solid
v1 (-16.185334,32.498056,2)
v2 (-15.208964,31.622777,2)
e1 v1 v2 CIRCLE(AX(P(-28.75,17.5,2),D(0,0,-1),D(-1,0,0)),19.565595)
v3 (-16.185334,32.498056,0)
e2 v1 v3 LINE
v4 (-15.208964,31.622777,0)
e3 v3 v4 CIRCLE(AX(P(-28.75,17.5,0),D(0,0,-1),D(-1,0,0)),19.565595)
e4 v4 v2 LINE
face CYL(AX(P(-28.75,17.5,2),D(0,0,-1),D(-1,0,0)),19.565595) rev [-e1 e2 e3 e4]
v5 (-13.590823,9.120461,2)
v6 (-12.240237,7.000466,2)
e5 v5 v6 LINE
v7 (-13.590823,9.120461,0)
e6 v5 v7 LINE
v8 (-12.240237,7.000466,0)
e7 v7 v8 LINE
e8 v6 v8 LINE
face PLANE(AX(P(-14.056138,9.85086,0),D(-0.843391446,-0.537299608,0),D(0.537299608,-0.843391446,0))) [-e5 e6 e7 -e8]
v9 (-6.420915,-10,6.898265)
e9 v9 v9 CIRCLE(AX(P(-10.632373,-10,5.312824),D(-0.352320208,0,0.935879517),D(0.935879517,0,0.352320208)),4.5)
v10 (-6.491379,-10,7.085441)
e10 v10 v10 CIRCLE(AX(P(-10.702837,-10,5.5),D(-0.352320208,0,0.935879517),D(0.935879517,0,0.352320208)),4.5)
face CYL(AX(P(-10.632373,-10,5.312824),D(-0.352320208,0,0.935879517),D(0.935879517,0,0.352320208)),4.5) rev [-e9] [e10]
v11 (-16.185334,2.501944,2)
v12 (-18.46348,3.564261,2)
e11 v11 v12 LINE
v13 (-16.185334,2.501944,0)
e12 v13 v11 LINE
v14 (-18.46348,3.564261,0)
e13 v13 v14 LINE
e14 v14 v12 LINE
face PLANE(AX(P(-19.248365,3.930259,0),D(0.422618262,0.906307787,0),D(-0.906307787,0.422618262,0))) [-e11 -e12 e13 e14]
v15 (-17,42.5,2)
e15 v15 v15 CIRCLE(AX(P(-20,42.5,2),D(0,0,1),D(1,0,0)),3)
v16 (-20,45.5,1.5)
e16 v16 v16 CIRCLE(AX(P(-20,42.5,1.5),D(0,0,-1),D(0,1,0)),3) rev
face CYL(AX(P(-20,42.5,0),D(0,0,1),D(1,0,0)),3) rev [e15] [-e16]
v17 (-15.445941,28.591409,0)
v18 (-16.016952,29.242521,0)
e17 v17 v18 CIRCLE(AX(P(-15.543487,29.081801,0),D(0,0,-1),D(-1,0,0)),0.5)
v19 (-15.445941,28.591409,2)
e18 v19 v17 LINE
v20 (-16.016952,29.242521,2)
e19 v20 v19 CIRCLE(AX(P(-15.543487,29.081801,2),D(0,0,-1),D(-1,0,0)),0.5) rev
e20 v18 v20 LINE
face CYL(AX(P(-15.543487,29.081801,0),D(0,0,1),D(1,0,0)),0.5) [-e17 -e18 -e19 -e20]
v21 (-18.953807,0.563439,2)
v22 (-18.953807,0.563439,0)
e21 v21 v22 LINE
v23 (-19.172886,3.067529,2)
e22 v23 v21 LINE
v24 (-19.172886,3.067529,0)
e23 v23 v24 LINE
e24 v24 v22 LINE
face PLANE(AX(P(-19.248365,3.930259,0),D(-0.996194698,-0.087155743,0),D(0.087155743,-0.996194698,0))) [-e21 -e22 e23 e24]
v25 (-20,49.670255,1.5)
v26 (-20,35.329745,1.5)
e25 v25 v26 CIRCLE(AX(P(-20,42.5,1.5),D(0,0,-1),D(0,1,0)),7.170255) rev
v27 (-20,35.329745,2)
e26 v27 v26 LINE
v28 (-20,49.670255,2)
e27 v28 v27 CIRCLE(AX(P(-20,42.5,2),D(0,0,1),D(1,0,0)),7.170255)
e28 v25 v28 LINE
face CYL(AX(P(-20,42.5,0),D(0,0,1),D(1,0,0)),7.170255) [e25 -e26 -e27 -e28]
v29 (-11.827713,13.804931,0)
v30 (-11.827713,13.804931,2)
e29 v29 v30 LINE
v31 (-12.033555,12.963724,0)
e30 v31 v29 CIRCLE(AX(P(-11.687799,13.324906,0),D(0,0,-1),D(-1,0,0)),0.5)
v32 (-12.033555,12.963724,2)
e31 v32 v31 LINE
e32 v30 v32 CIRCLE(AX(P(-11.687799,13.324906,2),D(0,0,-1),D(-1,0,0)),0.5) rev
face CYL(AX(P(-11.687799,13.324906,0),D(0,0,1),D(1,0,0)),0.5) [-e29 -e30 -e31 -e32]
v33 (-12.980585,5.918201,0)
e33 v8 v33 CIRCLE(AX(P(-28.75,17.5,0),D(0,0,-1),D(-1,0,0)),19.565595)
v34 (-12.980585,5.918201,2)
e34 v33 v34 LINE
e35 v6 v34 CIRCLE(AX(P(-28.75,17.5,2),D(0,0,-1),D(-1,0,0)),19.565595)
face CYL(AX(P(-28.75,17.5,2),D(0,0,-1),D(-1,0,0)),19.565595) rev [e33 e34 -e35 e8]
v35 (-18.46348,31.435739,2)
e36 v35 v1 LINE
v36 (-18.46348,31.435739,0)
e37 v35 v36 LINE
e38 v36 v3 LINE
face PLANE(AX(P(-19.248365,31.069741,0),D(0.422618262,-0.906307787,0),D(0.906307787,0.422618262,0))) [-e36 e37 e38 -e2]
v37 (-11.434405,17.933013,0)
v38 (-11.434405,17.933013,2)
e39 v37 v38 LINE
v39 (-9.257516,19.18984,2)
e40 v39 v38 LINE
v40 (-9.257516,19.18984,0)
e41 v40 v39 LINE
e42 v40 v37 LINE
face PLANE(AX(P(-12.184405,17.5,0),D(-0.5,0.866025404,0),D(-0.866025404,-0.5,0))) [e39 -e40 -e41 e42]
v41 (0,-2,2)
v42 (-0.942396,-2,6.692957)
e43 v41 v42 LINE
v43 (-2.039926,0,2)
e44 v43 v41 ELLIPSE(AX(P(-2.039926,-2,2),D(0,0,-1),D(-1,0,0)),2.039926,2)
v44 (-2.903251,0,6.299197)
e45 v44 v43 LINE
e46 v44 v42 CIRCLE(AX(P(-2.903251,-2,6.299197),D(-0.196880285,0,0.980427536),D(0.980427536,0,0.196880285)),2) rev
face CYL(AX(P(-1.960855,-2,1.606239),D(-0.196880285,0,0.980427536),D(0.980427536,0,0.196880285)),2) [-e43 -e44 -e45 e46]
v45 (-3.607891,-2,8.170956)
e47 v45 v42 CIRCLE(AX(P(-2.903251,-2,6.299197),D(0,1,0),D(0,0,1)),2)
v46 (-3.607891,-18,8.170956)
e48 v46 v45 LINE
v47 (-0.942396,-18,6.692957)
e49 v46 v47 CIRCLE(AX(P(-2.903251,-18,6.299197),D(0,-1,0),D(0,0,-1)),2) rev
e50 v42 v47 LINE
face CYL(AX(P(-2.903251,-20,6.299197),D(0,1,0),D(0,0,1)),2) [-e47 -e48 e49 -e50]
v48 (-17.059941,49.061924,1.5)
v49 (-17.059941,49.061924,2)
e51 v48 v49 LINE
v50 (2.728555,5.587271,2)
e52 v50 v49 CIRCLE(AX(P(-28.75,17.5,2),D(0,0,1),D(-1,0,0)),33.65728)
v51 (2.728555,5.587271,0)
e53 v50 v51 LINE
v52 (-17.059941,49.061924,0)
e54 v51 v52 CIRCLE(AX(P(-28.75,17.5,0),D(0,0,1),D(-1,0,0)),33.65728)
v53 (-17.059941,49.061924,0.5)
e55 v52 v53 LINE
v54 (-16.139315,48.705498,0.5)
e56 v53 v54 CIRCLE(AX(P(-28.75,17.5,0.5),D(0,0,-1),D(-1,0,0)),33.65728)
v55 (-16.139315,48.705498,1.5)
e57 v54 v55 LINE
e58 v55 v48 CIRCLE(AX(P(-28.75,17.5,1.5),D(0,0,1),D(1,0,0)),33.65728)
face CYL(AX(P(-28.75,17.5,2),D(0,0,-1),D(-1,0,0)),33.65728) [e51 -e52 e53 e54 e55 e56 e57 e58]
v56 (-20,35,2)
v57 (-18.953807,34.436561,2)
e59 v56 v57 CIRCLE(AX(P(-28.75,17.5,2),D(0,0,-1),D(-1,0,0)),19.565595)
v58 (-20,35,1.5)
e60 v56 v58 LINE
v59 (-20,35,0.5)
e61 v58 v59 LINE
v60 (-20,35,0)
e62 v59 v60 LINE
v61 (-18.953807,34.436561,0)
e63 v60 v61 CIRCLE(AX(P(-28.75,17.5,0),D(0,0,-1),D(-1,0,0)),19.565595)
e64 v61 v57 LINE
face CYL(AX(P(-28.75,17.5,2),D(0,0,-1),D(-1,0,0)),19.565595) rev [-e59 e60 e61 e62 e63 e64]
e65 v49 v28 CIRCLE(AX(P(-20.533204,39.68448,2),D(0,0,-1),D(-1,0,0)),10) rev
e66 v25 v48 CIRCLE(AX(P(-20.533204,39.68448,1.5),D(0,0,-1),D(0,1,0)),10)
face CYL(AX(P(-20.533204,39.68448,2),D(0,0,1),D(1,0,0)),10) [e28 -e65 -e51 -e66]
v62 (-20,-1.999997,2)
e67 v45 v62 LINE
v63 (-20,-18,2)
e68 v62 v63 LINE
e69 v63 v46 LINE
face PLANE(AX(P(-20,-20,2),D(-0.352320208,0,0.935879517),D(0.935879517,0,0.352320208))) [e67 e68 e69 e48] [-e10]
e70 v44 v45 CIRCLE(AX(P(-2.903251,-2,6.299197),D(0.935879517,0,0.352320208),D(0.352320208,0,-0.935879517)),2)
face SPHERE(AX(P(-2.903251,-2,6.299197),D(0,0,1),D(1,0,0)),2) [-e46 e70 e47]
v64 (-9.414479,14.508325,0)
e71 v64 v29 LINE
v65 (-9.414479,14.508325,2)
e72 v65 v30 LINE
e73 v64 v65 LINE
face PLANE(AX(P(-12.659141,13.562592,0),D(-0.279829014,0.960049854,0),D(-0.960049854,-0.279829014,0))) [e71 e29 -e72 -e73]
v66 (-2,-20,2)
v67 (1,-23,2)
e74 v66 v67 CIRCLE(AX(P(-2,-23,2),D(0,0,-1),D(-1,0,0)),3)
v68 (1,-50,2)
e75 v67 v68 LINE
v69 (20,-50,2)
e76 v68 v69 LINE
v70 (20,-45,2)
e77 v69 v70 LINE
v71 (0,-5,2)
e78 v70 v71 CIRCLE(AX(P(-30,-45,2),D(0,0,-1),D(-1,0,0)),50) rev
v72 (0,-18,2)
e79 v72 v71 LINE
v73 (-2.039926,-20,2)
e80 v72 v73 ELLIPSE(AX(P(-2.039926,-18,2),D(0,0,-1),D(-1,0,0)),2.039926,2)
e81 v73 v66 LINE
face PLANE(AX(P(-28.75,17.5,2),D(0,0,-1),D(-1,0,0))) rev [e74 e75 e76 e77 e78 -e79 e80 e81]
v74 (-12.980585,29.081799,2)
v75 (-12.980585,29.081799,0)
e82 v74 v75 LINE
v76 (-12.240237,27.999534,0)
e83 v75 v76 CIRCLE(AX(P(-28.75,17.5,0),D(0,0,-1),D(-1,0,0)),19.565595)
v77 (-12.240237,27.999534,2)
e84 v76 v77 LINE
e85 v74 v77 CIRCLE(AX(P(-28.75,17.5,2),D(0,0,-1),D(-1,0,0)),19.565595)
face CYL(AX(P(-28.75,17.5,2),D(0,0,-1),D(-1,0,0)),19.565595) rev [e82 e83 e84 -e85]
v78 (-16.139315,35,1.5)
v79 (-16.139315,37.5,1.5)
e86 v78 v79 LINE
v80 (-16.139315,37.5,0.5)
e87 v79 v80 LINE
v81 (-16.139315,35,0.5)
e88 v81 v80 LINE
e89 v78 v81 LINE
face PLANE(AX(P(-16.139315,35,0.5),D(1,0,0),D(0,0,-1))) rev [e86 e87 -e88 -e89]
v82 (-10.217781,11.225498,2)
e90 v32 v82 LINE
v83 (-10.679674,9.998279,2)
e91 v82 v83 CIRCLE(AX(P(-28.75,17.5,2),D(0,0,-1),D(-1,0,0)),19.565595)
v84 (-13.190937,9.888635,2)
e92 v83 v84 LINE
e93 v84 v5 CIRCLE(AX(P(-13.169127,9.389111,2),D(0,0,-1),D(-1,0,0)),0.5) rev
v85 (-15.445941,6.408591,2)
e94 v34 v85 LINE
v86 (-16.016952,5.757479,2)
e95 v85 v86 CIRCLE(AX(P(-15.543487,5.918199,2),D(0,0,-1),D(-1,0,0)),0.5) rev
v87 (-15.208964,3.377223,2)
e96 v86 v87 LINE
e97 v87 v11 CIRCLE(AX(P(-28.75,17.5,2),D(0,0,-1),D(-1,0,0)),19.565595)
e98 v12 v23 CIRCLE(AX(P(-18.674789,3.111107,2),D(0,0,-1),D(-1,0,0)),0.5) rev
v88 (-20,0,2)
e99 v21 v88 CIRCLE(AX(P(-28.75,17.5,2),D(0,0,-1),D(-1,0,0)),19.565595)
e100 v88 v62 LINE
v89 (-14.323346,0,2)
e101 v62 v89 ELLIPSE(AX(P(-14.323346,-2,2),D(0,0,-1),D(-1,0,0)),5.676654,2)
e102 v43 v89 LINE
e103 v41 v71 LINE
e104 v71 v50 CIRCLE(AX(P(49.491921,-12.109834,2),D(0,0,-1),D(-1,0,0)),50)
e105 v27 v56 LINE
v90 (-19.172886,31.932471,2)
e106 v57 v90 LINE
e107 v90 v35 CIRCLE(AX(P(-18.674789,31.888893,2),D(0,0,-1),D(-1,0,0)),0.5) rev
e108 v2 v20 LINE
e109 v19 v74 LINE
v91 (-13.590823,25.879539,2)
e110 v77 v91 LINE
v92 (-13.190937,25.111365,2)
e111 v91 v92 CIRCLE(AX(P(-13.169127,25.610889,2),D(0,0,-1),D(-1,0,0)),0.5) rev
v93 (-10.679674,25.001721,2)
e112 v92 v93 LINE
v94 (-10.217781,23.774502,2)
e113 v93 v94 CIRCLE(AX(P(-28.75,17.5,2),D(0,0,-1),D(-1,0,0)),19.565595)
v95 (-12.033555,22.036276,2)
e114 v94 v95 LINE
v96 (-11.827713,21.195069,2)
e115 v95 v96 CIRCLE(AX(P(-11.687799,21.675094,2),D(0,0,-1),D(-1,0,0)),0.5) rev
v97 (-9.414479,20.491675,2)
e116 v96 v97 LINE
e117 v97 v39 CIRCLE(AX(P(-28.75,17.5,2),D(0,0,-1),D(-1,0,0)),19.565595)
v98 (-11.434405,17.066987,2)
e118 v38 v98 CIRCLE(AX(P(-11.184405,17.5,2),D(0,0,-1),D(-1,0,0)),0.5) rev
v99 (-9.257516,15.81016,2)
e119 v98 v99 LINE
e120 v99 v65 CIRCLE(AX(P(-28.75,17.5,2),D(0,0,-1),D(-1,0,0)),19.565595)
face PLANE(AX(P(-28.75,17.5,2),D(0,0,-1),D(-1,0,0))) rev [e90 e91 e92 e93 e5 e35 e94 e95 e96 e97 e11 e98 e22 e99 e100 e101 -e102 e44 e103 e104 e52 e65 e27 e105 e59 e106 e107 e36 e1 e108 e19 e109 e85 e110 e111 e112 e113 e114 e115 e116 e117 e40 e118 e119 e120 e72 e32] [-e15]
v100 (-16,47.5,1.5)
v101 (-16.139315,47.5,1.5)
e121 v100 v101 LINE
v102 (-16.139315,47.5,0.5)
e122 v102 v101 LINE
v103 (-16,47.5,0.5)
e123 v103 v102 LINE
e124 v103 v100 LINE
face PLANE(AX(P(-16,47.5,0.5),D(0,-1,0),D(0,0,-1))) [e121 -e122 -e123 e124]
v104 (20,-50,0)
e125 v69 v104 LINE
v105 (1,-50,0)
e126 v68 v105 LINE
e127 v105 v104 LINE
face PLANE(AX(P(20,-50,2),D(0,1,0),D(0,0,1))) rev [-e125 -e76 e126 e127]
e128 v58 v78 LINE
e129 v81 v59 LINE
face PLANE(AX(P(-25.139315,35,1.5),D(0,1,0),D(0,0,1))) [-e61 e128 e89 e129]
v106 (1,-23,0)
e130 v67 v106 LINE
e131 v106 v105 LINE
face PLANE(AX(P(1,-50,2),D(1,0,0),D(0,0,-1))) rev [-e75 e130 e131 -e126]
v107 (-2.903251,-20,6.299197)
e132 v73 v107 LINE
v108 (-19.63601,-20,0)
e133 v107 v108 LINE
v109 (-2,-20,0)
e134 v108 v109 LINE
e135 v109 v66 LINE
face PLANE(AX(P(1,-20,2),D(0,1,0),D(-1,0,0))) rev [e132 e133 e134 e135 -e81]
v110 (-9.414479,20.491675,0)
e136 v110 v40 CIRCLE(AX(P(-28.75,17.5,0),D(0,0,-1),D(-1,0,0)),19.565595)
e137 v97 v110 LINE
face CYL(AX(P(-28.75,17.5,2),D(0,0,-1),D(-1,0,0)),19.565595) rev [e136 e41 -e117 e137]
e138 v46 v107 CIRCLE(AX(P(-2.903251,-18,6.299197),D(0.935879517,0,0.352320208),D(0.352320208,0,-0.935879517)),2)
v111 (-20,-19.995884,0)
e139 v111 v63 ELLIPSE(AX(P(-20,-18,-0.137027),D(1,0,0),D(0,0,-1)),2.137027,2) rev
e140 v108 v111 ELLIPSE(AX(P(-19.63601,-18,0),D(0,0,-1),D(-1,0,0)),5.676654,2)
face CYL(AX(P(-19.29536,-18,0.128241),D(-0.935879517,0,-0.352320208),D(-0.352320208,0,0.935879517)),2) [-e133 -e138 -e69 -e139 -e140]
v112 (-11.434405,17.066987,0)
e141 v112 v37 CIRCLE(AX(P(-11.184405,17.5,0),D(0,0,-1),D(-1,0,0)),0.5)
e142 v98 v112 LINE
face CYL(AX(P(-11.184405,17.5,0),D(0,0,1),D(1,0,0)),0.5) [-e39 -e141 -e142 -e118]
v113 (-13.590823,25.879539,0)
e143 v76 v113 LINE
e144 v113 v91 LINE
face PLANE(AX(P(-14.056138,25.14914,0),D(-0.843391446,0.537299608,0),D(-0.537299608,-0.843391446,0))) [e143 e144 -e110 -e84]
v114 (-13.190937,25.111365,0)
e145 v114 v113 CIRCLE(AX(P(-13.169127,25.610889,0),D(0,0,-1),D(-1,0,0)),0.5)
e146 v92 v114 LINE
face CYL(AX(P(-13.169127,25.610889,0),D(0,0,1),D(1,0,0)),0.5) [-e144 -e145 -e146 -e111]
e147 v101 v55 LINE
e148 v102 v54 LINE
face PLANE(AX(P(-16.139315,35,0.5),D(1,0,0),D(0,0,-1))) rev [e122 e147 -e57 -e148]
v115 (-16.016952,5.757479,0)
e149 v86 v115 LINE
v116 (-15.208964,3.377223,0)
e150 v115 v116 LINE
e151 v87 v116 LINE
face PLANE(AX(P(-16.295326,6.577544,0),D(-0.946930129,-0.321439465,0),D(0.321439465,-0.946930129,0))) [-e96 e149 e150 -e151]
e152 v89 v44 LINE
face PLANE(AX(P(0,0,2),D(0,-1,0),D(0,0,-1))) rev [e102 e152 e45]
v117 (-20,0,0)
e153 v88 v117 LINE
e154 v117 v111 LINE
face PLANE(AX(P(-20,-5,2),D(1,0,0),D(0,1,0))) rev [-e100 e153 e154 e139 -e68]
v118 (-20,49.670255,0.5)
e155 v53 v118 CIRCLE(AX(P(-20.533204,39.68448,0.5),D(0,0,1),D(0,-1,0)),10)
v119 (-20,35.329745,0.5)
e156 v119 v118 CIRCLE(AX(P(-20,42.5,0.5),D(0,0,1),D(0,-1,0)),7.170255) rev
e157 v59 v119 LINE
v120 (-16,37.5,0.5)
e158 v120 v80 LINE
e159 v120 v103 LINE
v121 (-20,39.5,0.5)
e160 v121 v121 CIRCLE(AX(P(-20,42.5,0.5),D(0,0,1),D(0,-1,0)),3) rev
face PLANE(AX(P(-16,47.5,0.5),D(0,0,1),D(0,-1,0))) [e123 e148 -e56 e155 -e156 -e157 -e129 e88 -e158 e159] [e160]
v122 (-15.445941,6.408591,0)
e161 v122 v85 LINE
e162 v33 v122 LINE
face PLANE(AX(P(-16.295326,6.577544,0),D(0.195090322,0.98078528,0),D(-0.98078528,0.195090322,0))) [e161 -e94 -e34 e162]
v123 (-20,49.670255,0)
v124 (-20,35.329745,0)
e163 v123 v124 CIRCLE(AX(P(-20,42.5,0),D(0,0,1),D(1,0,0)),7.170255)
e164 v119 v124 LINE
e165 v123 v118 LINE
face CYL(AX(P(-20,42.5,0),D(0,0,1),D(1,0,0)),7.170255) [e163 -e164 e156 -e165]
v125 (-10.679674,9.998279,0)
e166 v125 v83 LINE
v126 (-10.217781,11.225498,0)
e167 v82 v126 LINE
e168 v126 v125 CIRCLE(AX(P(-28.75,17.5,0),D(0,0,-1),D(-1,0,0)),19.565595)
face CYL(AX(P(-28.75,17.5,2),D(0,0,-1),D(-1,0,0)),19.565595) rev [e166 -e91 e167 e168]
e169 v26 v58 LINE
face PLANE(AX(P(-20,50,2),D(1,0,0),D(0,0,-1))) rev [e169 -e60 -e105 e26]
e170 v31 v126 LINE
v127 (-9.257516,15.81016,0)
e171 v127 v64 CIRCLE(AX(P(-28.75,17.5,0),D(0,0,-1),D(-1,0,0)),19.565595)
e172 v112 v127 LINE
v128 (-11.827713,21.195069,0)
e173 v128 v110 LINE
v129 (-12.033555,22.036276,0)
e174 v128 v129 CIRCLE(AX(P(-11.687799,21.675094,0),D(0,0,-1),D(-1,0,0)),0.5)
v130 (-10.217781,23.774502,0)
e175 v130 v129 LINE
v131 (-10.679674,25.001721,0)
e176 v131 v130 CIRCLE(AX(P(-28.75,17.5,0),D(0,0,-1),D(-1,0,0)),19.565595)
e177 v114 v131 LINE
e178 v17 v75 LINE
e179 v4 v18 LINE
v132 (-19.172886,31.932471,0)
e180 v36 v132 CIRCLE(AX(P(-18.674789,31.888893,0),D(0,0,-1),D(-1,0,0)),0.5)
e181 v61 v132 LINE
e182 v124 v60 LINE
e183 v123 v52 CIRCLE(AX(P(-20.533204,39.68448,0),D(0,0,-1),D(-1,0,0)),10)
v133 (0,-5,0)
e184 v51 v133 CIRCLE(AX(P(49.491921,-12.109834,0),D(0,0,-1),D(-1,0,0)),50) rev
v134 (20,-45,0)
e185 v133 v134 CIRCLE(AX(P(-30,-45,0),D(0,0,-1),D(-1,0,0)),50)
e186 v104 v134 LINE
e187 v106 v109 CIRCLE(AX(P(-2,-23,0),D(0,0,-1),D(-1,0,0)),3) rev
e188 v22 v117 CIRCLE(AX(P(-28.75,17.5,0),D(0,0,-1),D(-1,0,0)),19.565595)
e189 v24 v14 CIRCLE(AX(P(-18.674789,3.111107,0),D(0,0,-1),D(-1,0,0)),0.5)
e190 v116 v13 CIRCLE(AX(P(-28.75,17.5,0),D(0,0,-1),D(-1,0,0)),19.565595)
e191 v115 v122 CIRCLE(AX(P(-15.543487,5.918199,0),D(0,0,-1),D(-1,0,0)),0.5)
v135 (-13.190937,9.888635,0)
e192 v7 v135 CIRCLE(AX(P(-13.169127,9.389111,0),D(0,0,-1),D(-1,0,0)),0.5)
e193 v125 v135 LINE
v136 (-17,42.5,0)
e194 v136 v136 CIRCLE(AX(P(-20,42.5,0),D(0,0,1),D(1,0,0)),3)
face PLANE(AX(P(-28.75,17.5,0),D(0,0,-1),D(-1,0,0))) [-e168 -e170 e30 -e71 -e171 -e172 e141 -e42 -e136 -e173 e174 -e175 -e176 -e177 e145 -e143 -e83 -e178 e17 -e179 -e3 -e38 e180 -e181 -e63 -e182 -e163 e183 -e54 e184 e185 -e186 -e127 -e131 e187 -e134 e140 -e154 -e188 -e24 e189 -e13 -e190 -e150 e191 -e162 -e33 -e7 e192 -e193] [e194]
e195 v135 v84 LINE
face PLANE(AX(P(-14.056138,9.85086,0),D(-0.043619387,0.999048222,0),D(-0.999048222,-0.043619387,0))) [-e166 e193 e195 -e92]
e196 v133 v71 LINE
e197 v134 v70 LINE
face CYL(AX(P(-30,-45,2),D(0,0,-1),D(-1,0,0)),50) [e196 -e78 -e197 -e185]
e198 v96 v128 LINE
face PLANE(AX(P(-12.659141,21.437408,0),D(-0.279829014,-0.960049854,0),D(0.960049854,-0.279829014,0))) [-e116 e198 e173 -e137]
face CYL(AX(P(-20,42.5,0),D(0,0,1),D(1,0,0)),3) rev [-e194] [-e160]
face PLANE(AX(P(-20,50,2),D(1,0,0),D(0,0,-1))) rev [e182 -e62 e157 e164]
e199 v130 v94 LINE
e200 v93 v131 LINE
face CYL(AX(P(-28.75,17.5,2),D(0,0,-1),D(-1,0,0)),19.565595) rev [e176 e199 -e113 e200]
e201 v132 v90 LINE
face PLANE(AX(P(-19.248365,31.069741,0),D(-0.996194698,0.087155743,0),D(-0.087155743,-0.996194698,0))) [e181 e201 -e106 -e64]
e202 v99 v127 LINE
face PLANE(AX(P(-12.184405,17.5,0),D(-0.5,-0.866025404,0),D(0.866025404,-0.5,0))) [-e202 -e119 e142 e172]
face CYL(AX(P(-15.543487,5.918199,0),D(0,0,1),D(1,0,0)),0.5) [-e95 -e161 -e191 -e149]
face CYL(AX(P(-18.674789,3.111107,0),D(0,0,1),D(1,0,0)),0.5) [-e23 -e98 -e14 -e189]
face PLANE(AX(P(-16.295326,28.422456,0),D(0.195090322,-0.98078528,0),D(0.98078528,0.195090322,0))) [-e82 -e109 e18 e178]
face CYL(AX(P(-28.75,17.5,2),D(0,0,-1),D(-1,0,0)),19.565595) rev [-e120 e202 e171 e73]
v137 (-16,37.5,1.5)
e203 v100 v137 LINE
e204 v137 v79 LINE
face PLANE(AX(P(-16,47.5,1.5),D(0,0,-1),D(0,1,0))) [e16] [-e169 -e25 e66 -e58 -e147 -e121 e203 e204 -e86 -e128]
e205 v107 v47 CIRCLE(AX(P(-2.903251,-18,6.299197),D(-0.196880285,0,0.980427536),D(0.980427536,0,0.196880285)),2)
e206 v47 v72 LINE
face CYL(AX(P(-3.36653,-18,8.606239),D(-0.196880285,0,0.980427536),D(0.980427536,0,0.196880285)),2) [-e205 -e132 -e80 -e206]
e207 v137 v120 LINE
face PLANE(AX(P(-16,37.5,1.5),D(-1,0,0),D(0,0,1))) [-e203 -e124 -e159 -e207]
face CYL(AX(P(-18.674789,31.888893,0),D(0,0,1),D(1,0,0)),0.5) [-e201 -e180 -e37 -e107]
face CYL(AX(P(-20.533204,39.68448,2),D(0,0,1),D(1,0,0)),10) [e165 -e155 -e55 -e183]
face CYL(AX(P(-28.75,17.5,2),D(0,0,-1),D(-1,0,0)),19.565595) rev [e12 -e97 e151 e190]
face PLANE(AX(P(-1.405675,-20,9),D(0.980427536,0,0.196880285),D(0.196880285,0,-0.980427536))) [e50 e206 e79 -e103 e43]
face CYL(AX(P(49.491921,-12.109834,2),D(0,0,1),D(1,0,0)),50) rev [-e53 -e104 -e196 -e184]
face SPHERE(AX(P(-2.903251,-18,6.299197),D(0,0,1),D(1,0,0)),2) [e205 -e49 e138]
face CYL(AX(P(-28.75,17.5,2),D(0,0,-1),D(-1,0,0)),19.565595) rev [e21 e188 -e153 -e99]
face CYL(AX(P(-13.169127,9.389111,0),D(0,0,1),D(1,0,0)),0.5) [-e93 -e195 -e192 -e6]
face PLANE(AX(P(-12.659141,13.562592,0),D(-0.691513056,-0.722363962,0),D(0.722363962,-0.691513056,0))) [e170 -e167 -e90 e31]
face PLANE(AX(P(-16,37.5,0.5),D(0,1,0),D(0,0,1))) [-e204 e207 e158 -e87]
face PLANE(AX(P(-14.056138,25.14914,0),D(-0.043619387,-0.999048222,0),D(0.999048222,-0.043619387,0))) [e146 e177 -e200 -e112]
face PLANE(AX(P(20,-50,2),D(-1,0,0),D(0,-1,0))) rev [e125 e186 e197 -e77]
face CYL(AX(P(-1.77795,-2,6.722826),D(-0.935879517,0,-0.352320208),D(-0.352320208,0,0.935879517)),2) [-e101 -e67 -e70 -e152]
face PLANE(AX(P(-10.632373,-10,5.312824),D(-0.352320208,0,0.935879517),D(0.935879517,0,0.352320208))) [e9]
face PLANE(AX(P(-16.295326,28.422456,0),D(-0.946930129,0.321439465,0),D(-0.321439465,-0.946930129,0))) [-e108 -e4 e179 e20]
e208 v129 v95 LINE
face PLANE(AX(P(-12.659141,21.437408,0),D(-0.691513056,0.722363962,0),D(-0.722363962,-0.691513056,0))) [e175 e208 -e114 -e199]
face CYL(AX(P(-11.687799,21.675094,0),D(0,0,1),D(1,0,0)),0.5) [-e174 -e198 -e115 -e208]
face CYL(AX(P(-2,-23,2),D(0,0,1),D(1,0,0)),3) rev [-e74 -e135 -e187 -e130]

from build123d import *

# Parameters (mm, degrees)
BOSS_EXTRUDE1_DEPTH       = 2
BOSS_EXTRUDE2_DEPTH       = 2
CIRPATTERN1_COUNT         = 5
CIRPATTERN1_ANGLE         = 55
CIRPATTERN2_COPY_1_DEPTH  = 2
CIRPATTERN2_COPY_2_DEPTH  = 2
CIRPATTERN2_COPY_3_DEPTH  = 2
CIRPATTERN2_COPY_4_DEPTH  = 2
CIRPATTERN2_COPY_5_DEPTH  = 2
CIRPATTERN2_COPY_6_DEPTH  = 2
CIRPATTERN2_COPY_7_DEPTH  = 2
CIRPATTERN2_COPY_8_DEPTH  = 2
CIRPATTERN2_COPY_9_DEPTH  = 2
CIRPATTERN2_COPY_10_DEPTH = 2
CIRPATTERN2_COPY_11_DEPTH = 2
CIRPATTERN2_COPY_12_DEPTH = 2
CIRPATTERN2_COPY_13_DEPTH = 2
CIRPATTERN2_COPY_14_DEPTH = 2
CIRPATTERN2_COPY_15_DEPTH = 2
CIRPATTERN2_COPY_16_DEPTH = 2
CIRPATTERN2_COPY_17_DEPTH = 2
CIRPATTERN2_COPY_18_DEPTH = 2
CIRPATTERN2_COPY_19_DEPTH = 2
CIRPATTERN2_COPY_20_DEPTH = 2
BOSS_EXTRUDE3_START       = -20
BOSS_EXTRUDE3_DEPTH       = 20
SKETCH7_R                 = 4.5
CUT_EXTRUDE1_DEPTH        = 0.2
FILLET1_R                 = 2
SKETCH15_R                = 7.170254919
BOSS_EXTRUDE6_DEPTH       = 2
SKETCH16_R                = 3
CUT_EXTRUDE2_DEPTH        = 58.252970512
SKETCH17_W                = 1
SKETCH17_H                = 10
CUT_EXTRUDE3_DEPTH        = 14
SKETCH18_W                = 9
SKETCH18_H                = 1
CUT_EXTRUDE4_DEPTH        = 20
FILLET2_R                 = 10
FILLET3_R                 = 50
FILLET5_R                 = 0.5
FILLET6_R                 = 3


with BuildPart() as part:
    # Sketch1 → Boss-Extrude1 (new body)
    with BuildSketch(Plane.XY):
        with BuildLine():
            Line((-20, -5), (-20, -20))
            Line((-20, -20), (0, -20))
            Line((0, -20), (1, -20))
            Line((1, -20), (1, -50))
            Line((1, -50), (20, -50))
            Line((20, -50), (20, -5))
            Line((20, -5), (0, -5))
            Line((0, -5), (0, 0))
            ThreePointArc((0, 0), (2.5, 30), (-20, 50))
            Line((-20, 50), (-20, 35))
            ThreePointArc((-20, 35), (-9.184405197, 17.5), (-20, 0))
            Line((-20, 0), (-20, -5))
        make_face()
    extrude(amount=BOSS_EXTRUDE1_DEPTH)

    # Sketch2 → Boss-Extrude2 (add)
    with BuildSketch(Plane.XY.offset(2)):
        Polygon((-12.184405197, 17.5), (-8.511312338, 19.620661151), (-8.511312338, 15.379338849), align=None)
    boss_extrude2 = extrude(amount=-BOSS_EXTRUDE2_DEPTH)

    # CirPattern1: Boss-Extrude2 ×5 about axis
    cirpattern1_axis = Axis((-28.75, 17.5, 0), (0, 0, -1))
    for i in range(1, CIRPATTERN1_COUNT):
        add(boss_extrude2.rotate(cirpattern1_axis, i * CIRPATTERN1_ANGLE / (CIRPATTERN1_COUNT - 1)))

    # CirPattern2 copy 1 sketch → CirPattern2 copy 1 (add)
    with BuildSketch(Plane.XY.offset(2)):
        Polygon((-12.184405197, 17.5), (-8.511312338, 19.620661151), (-8.511312338, 15.379338849), align=None)
    extrude(amount=-CIRPATTERN2_COPY_1_DEPTH)

    # CirPattern2 copy 2 sketch → CirPattern2 copy 2 (add)
    with BuildSketch(Plane(origin=(3.335587623, 7.334983183, 2), x_dir=(0.9713420698132613, 0.23768589232617357, 0), z_dir=(0, 0, 1))):
        Polygon((-12.184405197, 17.5), (-8.511312338, 19.620661151), (-8.511312338, 15.379338849), align=None)
    extrude(amount=-CIRPATTERN2_COPY_2_DEPTH)

    # CirPattern2 copy 3 sketch → CirPattern2 copy 3 (add)
    with BuildSketch(Plane(origin=(4.832162185, 15.25258305, 2), x_dir=(0.8870108331782213, 0.46174861323503485, 0), z_dir=(0, 0, 1))):
        Polygon((-12.184405197, 17.5), (-8.511312338, 19.620661151), (-8.511312338, 15.379338849), align=None)
    extrude(amount=-CIRPATTERN2_COPY_3_DEPTH)

    # CirPattern2 copy 4 sketch → CirPattern2 copy 4 (add)
    with BuildSketch(Plane(origin=(4.403946229, 23.298995553, 2), x_dir=(0.7518398074789764, 0.6593458151000701, 0), z_dir=(0, 0, 1))):
        Polygon((-12.184405197, 17.5), (-8.511312338, 19.620661151), (-8.511312338, 15.379338849), align=None)
    extrude(amount=-CIRPATTERN2_COPY_4_DEPTH)

    # CirPattern2 copy 5 sketch → CirPattern2 copy 5 (add)
    with BuildSketch(Plane(origin=(-4.983418609, -6.331955626, 2), x_dir=(0.9713420698132613, -0.23768589232617357, 0), z_dir=(0, 0, 1))):
        Polygon((-12.184405197, 17.5), (-8.511312338, 19.620661151), (-8.511312338, 15.379338849), align=None)
    extrude(amount=-CIRPATTERN2_COPY_5_DEPTH)

    # CirPattern2 copy 6 sketch → CirPattern2 copy 6 (add)
    with BuildSketch(Plane.XY.offset(2)):
        Polygon((-12.184405197, 17.5), (-8.511312338, 19.620661151), (-8.511312338, 15.379338849), align=None)
    extrude(amount=-CIRPATTERN2_COPY_6_DEPTH)

    # CirPattern2 copy 7 sketch → CirPattern2 copy 7 (add)
    with BuildSketch(Plane(origin=(3.335587623, 7.334983183, 2), x_dir=(0.9713420698132613, 0.2376858923261736, 0), z_dir=(0, 0, 1))):
        Polygon((-12.184405197, 17.5), (-8.511312338, 19.620661151), (-8.511312338, 15.379338849), align=None)
    extrude(amount=-CIRPATTERN2_COPY_7_DEPTH)

    # CirPattern2 copy 8 sketch → CirPattern2 copy 8 (add)
    with BuildSketch(Plane(origin=(4.832162185, 15.25258305, 2), x_dir=(0.8870108331782214, 0.4617486132350349, 0), z_dir=(0, 0, 1))):
        Polygon((-12.184405197, 17.5), (-8.511312338, 19.620661151), (-8.511312338, 15.379338849), align=None)
    extrude(amount=-CIRPATTERN2_COPY_8_DEPTH)

    # CirPattern2 copy 9 sketch → CirPattern2 copy 9 (add)
    with BuildSketch(Plane(origin=(-11.329039278, -11.297962211, 2), x_dir=(0.8870108331782213, -0.46174861323503485, 0), z_dir=(0, 0, 1))):
        Polygon((-12.184405197, 17.5), (-8.511312338, 19.620661151), (-8.511312338, 15.379338849), align=None)
    extrude(amount=-CIRPATTERN2_COPY_9_DEPTH)

    # CirPattern2 copy 10 sketch → CirPattern2 copy 10 (add)
    with BuildSketch(Plane(origin=(-4.983418609, -6.331955626, 2), x_dir=(0.9713420698132613, -0.2376858923261736, 0), z_dir=(0, 0, 1))):
        Polygon((-12.184405197, 17.5), (-8.511312338, 19.620661151), (-8.511312338, 15.379338849), align=None)
    extrude(amount=-CIRPATTERN2_COPY_10_DEPTH)

    # CirPattern2 copy 11 sketch → CirPattern2 copy 11 (add)
    with BuildSketch(Plane.XY.offset(2)):
        Polygon((-12.184405197, 17.5), (-8.511312338, 19.620661151), (-8.511312338, 15.379338849), align=None)
    extrude(amount=-CIRPATTERN2_COPY_11_DEPTH)

    # CirPattern2 copy 12 sketch → CirPattern2 copy 12 (add)
    with BuildSketch(Plane(origin=(3.335587623, 7.334983183, 2), x_dir=(0.9713420698132613, 0.2376858923261736, 0), z_dir=(0, 0, 1))):
        Polygon((-12.184405197, 17.5), (-8.511312338, 19.620661151), (-8.511312338, 15.379338849), align=None)
    extrude(amount=-CIRPATTERN2_COPY_12_DEPTH)

    # CirPattern2 copy 13 sketch → CirPattern2 copy 13 (add)
    with BuildSketch(Plane(origin=(-18.673157299, -14.613388815, 2), x_dir=(0.7518398074789764, -0.6593458151000701, 0), z_dir=(0, 0, 1))):
        Polygon((-12.184405197, 17.5), (-8.511312338, 19.620661151), (-8.511312338, 15.379338849), align=None)
    extrude(amount=-CIRPATTERN2_COPY_13_DEPTH)

    # CirPattern2 copy 14 sketch → CirPattern2 copy 14 (add)
    with BuildSketch(Plane(origin=(-11.329039278, -11.297962211, 2), x_dir=(0.8870108331782214, -0.4617486132350349, 0), z_dir=(0, 0, 1))):
        Polygon((-12.184405197, 17.5), (-8.511312338, 19.620661151), (-8.511312338, 15.379338849), align=None)
    extrude(amount=-CIRPATTERN2_COPY_14_DEPTH)

    # CirPattern2 copy 15 sketch → CirPattern2 copy 15 (add)
    with BuildSketch(Plane(origin=(-4.983418609, -6.331955626, 2), x_dir=(0.9713420698132613, -0.2376858923261736, 0), z_dir=(0, 0, 1))):
        Polygon((-12.184405197, 17.5), (-8.511312338, 19.620661151), (-8.511312338, 15.379338849), align=None)
    extrude(amount=-CIRPATTERN2_COPY_15_DEPTH)

    # CirPattern2 copy 16 sketch → CirPattern2 copy 16 (add)
    with BuildSketch(Plane.XY.offset(2)):
        Polygon((-12.184405197, 17.5), (-8.511312338, 19.620661151), (-8.511312338, 15.379338849), align=None)
    extrude(amount=-CIRPATTERN2_COPY_16_DEPTH)

    # CirPattern2 copy 17 sketch → CirPattern2 copy 17 (add)
    with BuildSketch(Plane(origin=(3.335587623, 7.334983183, 2), x_dir=(0.9713420698132613, 0.2376858923261736, 0), z_dir=(0, 0, 1))):
        Polygon((-12.184405197, 17.5), (-8.511312338, 19.620661151), (-8.511312338, 15.379338849), align=None)
    extrude(amount=-CIRPATTERN2_COPY_17_DEPTH)

    # CirPattern2 copy 18 sketch → CirPattern2 copy 18 (add)
    with BuildSketch(Plane(origin=(4.832162185, 15.25258305, 2), x_dir=(0.8870108331782213, 0.46174861323503485, 0), z_dir=(0, 0, 1))):
        Polygon((-12.184405197, 17.5), (-8.511312338, 19.620661151), (-8.511312338, 15.379338849), align=None)
    extrude(amount=-CIRPATTERN2_COPY_18_DEPTH)

    # CirPattern2 copy 19 sketch → CirPattern2 copy 19 (add)
    with BuildSketch(Plane(origin=(4.403946229, 23.298995553, 2), x_dir=(0.7518398074789764, 0.6593458151000701, 0), z_dir=(0, 0, 1))):
        Polygon((-12.184405197, 17.5), (-8.511312338, 19.620661151), (-8.511312338, 15.379338849), align=None)
    extrude(amount=-CIRPATTERN2_COPY_19_DEPTH)

    # CirPattern2 copy 20 sketch → CirPattern2 copy 20 (add)
    with BuildSketch(Plane(origin=(2.07548332, 31.013033637, 2), x_dir=(0.5735764363510444, 0.819152044288993, 0), z_dir=(0, 0, 1))):
        Polygon((-12.184405197, 17.5), (-8.511312338, 19.620661151), (-8.511312338, 15.379338849), align=None)
    extrude(amount=-CIRPATTERN2_COPY_20_DEPTH)

    # Sketch6 → Boss-Extrude3 (add)
    with BuildSketch(Plane(origin=(0, 0, 0), x_dir=(-1, 0, 0), z_dir=(0, 1, 0)).offset(BOSS_EXTRUDE3_START)):
        Polygon((20, 2), (1.405674507, 9), (0, 2), align=None)
    extrude(amount=BOSS_EXTRUDE3_DEPTH)

    # Sketch7 → Cut-Extrude1 (cut)
    with BuildSketch(Plane(origin=(-3.142049109, 0, 8.346326264), x_dir=(0.9358795174345517, 0, 0.3523202078315561), z_dir=(-0.3523202078315561, 0, 0.9358795174345517))):
        with Locations((-8.078805021, -10)):
            Circle(SKETCH7_R)
    extrude(amount=-CUT_EXTRUDE1_DEPTH, mode=Mode.SUBTRACT)

    # Fillet1
    # the kernel refuses this fillet: 2 mm, written as the material it takes off along each edge
    with BuildSketch(Plane(origin=(-2.90325086, -2, 6.299196783), x_dir=(0.9804275360510699, 0, 0.19688028482513967), z_dir=(0, 1, 0))) as fillet1_piece_1_section:
        Polygon((0, 0), (FILLET1_R * 1.02, 0), (FILLET1_R * 1.02, -FILLET1_R * 1.20008027832), (-FILLET1_R * 0.164391571457, -FILLET1_R * 1.00666549123), align=None)
    fillet1_piece_1 = extrude(amount=FILLET1_R * 1.02, mode=Mode.PRIVATE)
    fillet1_piece_1 = fillet1_piece_1 - Plane(origin=(-2.90325086, -2, 6.299196783), x_dir=(-0.4849326452097124, 0, -0.8745515019768195), z_dir=(0, 1, 0)) * Sphere(FILLET1_R, mode=Mode.PRIVATE)
    add(fillet1_piece_1, mode=Mode.SUBTRACT)
    with BuildSketch(Plane(origin=(-2.90325086, -18, 6.299196783), x_dir=(0.9804275360510699, 0, 0.19688028482513967), z_dir=(0, -1, 0))) as fillet1_piece_2_section:
        Polygon((0, 0), (FILLET1_R * 1.02, 0), (FILLET1_R * 1.02, FILLET1_R * 1.20008027832), (-FILLET1_R * 0.164391571457, FILLET1_R * 1.00666549123), align=None)
    fillet1_piece_2 = extrude(amount=FILLET1_R * 1.02, mode=Mode.PRIVATE)
    fillet1_piece_2 = fillet1_piece_2 - Plane(origin=(-2.90325086, -18, 6.299196783), x_dir=(-0.4849326452097124, 0, -0.8745515019768195), z_dir=(0, -1, 0)) * Sphere(FILLET1_R, mode=Mode.PRIVATE)
    add(fillet1_piece_2, mode=Mode.SUBTRACT)
    with BuildSketch(Plane(origin=(-0.942395788, 0, 6.692957352), x_dir=(-0.9804275360510698, 0, -0.19688028482513964), z_dir=(0.19688028482513967, 0, -0.9804275360510699))) as fillet1_piece_3_section:
        with BuildLine():
            CenterArc((FILLET1_R, -FILLET1_R), FILLET1_R, 90, 90)
            Line((0, -FILLET1_R), (0, 0))
            Line((0, 0), (FILLET1_R, 0))
        make_face()
    fillet1_piece_3 = extrude(amount=9.786643765, mode=Mode.PRIVATE)
    fillet1_piece_3 = split(fillet1_piece_3, bisect_by=Plane(origin=(-1.008191374, -0.349909599, 2), z_dir=(0, 0, 1)), keep=Keep.TOP, mode=Mode.PRIVATE)
    add(fillet1_piece_3, mode=Mode.SUBTRACT)
    with BuildSketch(Plane(origin=(-0.942395788, -20, 6.692957352), x_dir=(-0.9804275360510698, -8.88178419700125e-15, -0.19688028482513964), z_dir=(0.19688028482513967, 0, -0.9804275360510699))) as fillet1_piece_4_section:
        with BuildLine():
            CenterArc((FILLET1_R, FILLET1_R), FILLET1_R, 180, 90)
            Line((0, FILLET1_R), (0, 0))
            Line((0, 0), (FILLET1_R, 0))
        make_face()
    fillet1_piece_4 = extrude(amount=9.786643765, mode=Mode.PRIVATE)
    fillet1_piece_4 = split(fillet1_piece_4, bisect_by=Plane(origin=(-0.912007241, -19.549726982, 2), z_dir=(0, 0, 1)), keep=Keep.TOP, mode=Mode.PRIVATE)
    add(fillet1_piece_4, mode=Mode.SUBTRACT)
    with BuildSketch(Plane(origin=(-24.679397587, 0, 0.238398961), x_dir=(0, -1, 0), z_dir=(0.9358795174345516, 0, 0.35232020783155604))) as fillet1_piece_5_section:
        with BuildLine():
            CenterArc((FILLET1_R, FILLET1_R), FILLET1_R, 180, 90)
            Line((0, FILLET1_R), (0, 0))
            Line((0, 0), (FILLET1_R, 0))
        make_face()
    fillet1_piece_5 = extrude(amount=22.515191239, mode=Mode.PRIVATE)
    fillet1_piece_5 = split(fillet1_piece_5, bisect_by=Plane(origin=(-11.12775599, -0.460194973, 2), z_dir=(0, 0, 1)), keep=Keep.TOP, mode=Mode.PRIVATE)
    add(fillet1_piece_5, mode=Mode.SUBTRACT)
    with BuildSketch(Plane(origin=(-24.679397587, -20, 0.238398961), x_dir=(0, 1, 0), z_dir=(0.9358795174345516, 0, 0.35232020783155604))) as fillet1_piece_6:
        with BuildLine():
            CenterArc((FILLET1_R, -FILLET1_R), FILLET1_R, 90, 90)
            Line((0, -FILLET1_R), (0, 0))
            Line((0, 0), (FILLET1_R, 0))
        make_face()
    extrude(amount=22.515191239, mode=Mode.SUBTRACT)
    with BuildSketch(Plane(origin=(-1.405674507, -18, 9), x_dir=(-0.9358795174345511, 0, -0.3523202078315571), z_dir=(0, 1, 0))) as fillet1_piece_7:
        with BuildLine():
            CenterArc((FILLET1_R * 1.17654929247, -FILLET1_R), FILLET1_R, 90, 99.274709646)
            Line((FILLET1_R * 0.18962234028, -FILLET1_R * 1.16116820731), (0, 0))
            Line((0, 0), (FILLET1_R * 1.17654929247, 0))
        make_face()
    extrude(amount=16, mode=Mode.SUBTRACT)

    # Sketch15 → Boss-Extrude6 (add)
    with BuildSketch(Plane.XY.offset(2)):
        with Locations((-20, 42.5)):
            Circle(SKETCH15_R)
    extrude(amount=-BOSS_EXTRUDE6_DEPTH)

    # Sketch16 → Cut-Extrude2 (cut, through all)
    with BuildSketch(Plane.XY.offset(2)):
        with Locations((-20, 42.5)):
            Circle(SKETCH16_R)
    extrude(amount=-CUT_EXTRUDE2_DEPTH, mode=Mode.SUBTRACT)

    # Sketch17 → Cut-Extrude3 (cut)
    with BuildSketch(Plane(origin=(-30, 0, 0), x_dir=(0, 0, -1), z_dir=(1, 0, 0))):
        with Locations((-1, 42.5)):
            Rectangle(SKETCH17_W, SKETCH17_H)
    extrude(amount=CUT_EXTRUDE3_DEPTH, mode=Mode.SUBTRACT)

    # Sketch18 → Cut-Extrude4 (cut)
    with BuildSketch(Plane(origin=(0, 55, 0), x_dir=(-1, 0, 0), z_dir=(0, 1, 0))):
        with Locations((20.639314702, 1)):
            Rectangle(SKETCH18_W, SKETCH18_H)
    extrude(amount=-CUT_EXTRUDE4_DEPTH, mode=Mode.SUBTRACT)

    # Fillet2
    # the kernel refuses this fillet: 10 mm, written as the material it takes off along each edge
    with BuildSketch(Plane(origin=(-20, 50, -7.715216829), x_dir=(0.9526817633527526, -0.30396950138967865, 0), z_dir=(0, 0, 1))) as fillet2_piece_1:
        with BuildLine():
            CenterArc((2.627629196, -9.989485306), FILLET2_R, 87.372310771, 17.26738068)
            Line((0.100232448, -0.314142125), (0, 0))
            ThreePointArc((0, 0), (1.543043366, 0.035389598), (3.086086732, 0))
        make_face()
    extrude(amount=15.930433658, mode=Mode.SUBTRACT)
    with BuildSketch(Plane(origin=(-20, 50, -6.215216829), x_dir=(0, -1, 0), z_dir=(0, 0, 1))) as fillet2_piece_2:
        with BuildLine():
            CenterArc((10.315519613, -0.533204452), FILLET2_R, 159.676133382, 17.26738068)
            ThreePointArc((0.938076245, 2.940058549), (0.435323097, 1.480786633), (0, 0))
            Line((0, 0), (0.329745081, 0))
        make_face()
    extrude(amount=15.930433658, mode=Mode.SUBTRACT)

    # Fillet3
    # the kernel refuses this fillet: 50 mm, written as the material it adds along each edge
    with BuildSketch(Plane(origin=(0, 0, 0), x_dir=(0.43882064391112274, 0.8985746727331166, 0), z_dir=(0, 0, 1))) as fillet3_piece_1:
        with BuildLine():
            CenterArc((10.836486393, -49.78623208), FILLET3_R, 95.3000351, 12.553643777)
            Line((-4.492873364, -2.19410322), (-4.799460559, -1.242260642))
            ThreePointArc((-4.799460559, -1.242260642), (-2.685257326, -0.198476937), (-0.438820644, 0.898574673))
            Line((-0.438820644, 0.898574673), (0.092371197, 0.995724642))
            ThreePointArc((0.092371197, 0.995724642), (3.10896326, 0.856103065), (6.125555323, 0.995724642))
            Line((6.125555323, 0.995724642), (6.217926521, 0))
        make_face()
    extrude(amount=2)
    # the kernel refuses this fillet: 50 mm, written as the material it takes off along each edge
    with BuildSketch(Plane(origin=(20, -5, -100), x_dir=(-1, 0, 0), z_dir=(0, 0, 1))) as fillet3_2_piece_1:
        with BuildLine():
            CenterArc((50, 40), FILLET3_R, 180, 53.130102354)
            Line((0, 40), (-1, 40))
            Line((-1, 40), (-1, 0))
            Line((-1, 0), (0, -1))
            ThreePointArc((0, -1), (10, -1), (19.4, -0.8))
            Line((19.4, -0.8), (20, 0))
        make_face()
    extrude(amount=202, mode=Mode.SUBTRACT)

    # Fillet5
    fillet5_edges = [part.edges().sort_by_distance(p)[0] for p in [
        (-19.248365167, 3.930259152, 1),
        (-12.659140856, 21.437408183, 1),
        (-14.056137952, 25.149140428, 1),
        (-16.295326392, 28.422455608, 1),
        (-19.248365167, 31.069740848, 1),
        (-12.184405197, 17.5, 1),
        (-12.659140856, 13.562591817, 1),
        (-14.056137952, 9.850859572, 1),
        (-16.295326392, 6.577544392, 1),
    ]]
    fillet(fillet5_edges, radius=FILLET5_R)

    # Fillet6
    fillet6_edges = [part.edges().sort_by_distance(p)[0] for p in [
        (1, -20, 1),
    ]]
    fillet(fillet6_edges, radius=FILLET6_R)


solid = part.part
